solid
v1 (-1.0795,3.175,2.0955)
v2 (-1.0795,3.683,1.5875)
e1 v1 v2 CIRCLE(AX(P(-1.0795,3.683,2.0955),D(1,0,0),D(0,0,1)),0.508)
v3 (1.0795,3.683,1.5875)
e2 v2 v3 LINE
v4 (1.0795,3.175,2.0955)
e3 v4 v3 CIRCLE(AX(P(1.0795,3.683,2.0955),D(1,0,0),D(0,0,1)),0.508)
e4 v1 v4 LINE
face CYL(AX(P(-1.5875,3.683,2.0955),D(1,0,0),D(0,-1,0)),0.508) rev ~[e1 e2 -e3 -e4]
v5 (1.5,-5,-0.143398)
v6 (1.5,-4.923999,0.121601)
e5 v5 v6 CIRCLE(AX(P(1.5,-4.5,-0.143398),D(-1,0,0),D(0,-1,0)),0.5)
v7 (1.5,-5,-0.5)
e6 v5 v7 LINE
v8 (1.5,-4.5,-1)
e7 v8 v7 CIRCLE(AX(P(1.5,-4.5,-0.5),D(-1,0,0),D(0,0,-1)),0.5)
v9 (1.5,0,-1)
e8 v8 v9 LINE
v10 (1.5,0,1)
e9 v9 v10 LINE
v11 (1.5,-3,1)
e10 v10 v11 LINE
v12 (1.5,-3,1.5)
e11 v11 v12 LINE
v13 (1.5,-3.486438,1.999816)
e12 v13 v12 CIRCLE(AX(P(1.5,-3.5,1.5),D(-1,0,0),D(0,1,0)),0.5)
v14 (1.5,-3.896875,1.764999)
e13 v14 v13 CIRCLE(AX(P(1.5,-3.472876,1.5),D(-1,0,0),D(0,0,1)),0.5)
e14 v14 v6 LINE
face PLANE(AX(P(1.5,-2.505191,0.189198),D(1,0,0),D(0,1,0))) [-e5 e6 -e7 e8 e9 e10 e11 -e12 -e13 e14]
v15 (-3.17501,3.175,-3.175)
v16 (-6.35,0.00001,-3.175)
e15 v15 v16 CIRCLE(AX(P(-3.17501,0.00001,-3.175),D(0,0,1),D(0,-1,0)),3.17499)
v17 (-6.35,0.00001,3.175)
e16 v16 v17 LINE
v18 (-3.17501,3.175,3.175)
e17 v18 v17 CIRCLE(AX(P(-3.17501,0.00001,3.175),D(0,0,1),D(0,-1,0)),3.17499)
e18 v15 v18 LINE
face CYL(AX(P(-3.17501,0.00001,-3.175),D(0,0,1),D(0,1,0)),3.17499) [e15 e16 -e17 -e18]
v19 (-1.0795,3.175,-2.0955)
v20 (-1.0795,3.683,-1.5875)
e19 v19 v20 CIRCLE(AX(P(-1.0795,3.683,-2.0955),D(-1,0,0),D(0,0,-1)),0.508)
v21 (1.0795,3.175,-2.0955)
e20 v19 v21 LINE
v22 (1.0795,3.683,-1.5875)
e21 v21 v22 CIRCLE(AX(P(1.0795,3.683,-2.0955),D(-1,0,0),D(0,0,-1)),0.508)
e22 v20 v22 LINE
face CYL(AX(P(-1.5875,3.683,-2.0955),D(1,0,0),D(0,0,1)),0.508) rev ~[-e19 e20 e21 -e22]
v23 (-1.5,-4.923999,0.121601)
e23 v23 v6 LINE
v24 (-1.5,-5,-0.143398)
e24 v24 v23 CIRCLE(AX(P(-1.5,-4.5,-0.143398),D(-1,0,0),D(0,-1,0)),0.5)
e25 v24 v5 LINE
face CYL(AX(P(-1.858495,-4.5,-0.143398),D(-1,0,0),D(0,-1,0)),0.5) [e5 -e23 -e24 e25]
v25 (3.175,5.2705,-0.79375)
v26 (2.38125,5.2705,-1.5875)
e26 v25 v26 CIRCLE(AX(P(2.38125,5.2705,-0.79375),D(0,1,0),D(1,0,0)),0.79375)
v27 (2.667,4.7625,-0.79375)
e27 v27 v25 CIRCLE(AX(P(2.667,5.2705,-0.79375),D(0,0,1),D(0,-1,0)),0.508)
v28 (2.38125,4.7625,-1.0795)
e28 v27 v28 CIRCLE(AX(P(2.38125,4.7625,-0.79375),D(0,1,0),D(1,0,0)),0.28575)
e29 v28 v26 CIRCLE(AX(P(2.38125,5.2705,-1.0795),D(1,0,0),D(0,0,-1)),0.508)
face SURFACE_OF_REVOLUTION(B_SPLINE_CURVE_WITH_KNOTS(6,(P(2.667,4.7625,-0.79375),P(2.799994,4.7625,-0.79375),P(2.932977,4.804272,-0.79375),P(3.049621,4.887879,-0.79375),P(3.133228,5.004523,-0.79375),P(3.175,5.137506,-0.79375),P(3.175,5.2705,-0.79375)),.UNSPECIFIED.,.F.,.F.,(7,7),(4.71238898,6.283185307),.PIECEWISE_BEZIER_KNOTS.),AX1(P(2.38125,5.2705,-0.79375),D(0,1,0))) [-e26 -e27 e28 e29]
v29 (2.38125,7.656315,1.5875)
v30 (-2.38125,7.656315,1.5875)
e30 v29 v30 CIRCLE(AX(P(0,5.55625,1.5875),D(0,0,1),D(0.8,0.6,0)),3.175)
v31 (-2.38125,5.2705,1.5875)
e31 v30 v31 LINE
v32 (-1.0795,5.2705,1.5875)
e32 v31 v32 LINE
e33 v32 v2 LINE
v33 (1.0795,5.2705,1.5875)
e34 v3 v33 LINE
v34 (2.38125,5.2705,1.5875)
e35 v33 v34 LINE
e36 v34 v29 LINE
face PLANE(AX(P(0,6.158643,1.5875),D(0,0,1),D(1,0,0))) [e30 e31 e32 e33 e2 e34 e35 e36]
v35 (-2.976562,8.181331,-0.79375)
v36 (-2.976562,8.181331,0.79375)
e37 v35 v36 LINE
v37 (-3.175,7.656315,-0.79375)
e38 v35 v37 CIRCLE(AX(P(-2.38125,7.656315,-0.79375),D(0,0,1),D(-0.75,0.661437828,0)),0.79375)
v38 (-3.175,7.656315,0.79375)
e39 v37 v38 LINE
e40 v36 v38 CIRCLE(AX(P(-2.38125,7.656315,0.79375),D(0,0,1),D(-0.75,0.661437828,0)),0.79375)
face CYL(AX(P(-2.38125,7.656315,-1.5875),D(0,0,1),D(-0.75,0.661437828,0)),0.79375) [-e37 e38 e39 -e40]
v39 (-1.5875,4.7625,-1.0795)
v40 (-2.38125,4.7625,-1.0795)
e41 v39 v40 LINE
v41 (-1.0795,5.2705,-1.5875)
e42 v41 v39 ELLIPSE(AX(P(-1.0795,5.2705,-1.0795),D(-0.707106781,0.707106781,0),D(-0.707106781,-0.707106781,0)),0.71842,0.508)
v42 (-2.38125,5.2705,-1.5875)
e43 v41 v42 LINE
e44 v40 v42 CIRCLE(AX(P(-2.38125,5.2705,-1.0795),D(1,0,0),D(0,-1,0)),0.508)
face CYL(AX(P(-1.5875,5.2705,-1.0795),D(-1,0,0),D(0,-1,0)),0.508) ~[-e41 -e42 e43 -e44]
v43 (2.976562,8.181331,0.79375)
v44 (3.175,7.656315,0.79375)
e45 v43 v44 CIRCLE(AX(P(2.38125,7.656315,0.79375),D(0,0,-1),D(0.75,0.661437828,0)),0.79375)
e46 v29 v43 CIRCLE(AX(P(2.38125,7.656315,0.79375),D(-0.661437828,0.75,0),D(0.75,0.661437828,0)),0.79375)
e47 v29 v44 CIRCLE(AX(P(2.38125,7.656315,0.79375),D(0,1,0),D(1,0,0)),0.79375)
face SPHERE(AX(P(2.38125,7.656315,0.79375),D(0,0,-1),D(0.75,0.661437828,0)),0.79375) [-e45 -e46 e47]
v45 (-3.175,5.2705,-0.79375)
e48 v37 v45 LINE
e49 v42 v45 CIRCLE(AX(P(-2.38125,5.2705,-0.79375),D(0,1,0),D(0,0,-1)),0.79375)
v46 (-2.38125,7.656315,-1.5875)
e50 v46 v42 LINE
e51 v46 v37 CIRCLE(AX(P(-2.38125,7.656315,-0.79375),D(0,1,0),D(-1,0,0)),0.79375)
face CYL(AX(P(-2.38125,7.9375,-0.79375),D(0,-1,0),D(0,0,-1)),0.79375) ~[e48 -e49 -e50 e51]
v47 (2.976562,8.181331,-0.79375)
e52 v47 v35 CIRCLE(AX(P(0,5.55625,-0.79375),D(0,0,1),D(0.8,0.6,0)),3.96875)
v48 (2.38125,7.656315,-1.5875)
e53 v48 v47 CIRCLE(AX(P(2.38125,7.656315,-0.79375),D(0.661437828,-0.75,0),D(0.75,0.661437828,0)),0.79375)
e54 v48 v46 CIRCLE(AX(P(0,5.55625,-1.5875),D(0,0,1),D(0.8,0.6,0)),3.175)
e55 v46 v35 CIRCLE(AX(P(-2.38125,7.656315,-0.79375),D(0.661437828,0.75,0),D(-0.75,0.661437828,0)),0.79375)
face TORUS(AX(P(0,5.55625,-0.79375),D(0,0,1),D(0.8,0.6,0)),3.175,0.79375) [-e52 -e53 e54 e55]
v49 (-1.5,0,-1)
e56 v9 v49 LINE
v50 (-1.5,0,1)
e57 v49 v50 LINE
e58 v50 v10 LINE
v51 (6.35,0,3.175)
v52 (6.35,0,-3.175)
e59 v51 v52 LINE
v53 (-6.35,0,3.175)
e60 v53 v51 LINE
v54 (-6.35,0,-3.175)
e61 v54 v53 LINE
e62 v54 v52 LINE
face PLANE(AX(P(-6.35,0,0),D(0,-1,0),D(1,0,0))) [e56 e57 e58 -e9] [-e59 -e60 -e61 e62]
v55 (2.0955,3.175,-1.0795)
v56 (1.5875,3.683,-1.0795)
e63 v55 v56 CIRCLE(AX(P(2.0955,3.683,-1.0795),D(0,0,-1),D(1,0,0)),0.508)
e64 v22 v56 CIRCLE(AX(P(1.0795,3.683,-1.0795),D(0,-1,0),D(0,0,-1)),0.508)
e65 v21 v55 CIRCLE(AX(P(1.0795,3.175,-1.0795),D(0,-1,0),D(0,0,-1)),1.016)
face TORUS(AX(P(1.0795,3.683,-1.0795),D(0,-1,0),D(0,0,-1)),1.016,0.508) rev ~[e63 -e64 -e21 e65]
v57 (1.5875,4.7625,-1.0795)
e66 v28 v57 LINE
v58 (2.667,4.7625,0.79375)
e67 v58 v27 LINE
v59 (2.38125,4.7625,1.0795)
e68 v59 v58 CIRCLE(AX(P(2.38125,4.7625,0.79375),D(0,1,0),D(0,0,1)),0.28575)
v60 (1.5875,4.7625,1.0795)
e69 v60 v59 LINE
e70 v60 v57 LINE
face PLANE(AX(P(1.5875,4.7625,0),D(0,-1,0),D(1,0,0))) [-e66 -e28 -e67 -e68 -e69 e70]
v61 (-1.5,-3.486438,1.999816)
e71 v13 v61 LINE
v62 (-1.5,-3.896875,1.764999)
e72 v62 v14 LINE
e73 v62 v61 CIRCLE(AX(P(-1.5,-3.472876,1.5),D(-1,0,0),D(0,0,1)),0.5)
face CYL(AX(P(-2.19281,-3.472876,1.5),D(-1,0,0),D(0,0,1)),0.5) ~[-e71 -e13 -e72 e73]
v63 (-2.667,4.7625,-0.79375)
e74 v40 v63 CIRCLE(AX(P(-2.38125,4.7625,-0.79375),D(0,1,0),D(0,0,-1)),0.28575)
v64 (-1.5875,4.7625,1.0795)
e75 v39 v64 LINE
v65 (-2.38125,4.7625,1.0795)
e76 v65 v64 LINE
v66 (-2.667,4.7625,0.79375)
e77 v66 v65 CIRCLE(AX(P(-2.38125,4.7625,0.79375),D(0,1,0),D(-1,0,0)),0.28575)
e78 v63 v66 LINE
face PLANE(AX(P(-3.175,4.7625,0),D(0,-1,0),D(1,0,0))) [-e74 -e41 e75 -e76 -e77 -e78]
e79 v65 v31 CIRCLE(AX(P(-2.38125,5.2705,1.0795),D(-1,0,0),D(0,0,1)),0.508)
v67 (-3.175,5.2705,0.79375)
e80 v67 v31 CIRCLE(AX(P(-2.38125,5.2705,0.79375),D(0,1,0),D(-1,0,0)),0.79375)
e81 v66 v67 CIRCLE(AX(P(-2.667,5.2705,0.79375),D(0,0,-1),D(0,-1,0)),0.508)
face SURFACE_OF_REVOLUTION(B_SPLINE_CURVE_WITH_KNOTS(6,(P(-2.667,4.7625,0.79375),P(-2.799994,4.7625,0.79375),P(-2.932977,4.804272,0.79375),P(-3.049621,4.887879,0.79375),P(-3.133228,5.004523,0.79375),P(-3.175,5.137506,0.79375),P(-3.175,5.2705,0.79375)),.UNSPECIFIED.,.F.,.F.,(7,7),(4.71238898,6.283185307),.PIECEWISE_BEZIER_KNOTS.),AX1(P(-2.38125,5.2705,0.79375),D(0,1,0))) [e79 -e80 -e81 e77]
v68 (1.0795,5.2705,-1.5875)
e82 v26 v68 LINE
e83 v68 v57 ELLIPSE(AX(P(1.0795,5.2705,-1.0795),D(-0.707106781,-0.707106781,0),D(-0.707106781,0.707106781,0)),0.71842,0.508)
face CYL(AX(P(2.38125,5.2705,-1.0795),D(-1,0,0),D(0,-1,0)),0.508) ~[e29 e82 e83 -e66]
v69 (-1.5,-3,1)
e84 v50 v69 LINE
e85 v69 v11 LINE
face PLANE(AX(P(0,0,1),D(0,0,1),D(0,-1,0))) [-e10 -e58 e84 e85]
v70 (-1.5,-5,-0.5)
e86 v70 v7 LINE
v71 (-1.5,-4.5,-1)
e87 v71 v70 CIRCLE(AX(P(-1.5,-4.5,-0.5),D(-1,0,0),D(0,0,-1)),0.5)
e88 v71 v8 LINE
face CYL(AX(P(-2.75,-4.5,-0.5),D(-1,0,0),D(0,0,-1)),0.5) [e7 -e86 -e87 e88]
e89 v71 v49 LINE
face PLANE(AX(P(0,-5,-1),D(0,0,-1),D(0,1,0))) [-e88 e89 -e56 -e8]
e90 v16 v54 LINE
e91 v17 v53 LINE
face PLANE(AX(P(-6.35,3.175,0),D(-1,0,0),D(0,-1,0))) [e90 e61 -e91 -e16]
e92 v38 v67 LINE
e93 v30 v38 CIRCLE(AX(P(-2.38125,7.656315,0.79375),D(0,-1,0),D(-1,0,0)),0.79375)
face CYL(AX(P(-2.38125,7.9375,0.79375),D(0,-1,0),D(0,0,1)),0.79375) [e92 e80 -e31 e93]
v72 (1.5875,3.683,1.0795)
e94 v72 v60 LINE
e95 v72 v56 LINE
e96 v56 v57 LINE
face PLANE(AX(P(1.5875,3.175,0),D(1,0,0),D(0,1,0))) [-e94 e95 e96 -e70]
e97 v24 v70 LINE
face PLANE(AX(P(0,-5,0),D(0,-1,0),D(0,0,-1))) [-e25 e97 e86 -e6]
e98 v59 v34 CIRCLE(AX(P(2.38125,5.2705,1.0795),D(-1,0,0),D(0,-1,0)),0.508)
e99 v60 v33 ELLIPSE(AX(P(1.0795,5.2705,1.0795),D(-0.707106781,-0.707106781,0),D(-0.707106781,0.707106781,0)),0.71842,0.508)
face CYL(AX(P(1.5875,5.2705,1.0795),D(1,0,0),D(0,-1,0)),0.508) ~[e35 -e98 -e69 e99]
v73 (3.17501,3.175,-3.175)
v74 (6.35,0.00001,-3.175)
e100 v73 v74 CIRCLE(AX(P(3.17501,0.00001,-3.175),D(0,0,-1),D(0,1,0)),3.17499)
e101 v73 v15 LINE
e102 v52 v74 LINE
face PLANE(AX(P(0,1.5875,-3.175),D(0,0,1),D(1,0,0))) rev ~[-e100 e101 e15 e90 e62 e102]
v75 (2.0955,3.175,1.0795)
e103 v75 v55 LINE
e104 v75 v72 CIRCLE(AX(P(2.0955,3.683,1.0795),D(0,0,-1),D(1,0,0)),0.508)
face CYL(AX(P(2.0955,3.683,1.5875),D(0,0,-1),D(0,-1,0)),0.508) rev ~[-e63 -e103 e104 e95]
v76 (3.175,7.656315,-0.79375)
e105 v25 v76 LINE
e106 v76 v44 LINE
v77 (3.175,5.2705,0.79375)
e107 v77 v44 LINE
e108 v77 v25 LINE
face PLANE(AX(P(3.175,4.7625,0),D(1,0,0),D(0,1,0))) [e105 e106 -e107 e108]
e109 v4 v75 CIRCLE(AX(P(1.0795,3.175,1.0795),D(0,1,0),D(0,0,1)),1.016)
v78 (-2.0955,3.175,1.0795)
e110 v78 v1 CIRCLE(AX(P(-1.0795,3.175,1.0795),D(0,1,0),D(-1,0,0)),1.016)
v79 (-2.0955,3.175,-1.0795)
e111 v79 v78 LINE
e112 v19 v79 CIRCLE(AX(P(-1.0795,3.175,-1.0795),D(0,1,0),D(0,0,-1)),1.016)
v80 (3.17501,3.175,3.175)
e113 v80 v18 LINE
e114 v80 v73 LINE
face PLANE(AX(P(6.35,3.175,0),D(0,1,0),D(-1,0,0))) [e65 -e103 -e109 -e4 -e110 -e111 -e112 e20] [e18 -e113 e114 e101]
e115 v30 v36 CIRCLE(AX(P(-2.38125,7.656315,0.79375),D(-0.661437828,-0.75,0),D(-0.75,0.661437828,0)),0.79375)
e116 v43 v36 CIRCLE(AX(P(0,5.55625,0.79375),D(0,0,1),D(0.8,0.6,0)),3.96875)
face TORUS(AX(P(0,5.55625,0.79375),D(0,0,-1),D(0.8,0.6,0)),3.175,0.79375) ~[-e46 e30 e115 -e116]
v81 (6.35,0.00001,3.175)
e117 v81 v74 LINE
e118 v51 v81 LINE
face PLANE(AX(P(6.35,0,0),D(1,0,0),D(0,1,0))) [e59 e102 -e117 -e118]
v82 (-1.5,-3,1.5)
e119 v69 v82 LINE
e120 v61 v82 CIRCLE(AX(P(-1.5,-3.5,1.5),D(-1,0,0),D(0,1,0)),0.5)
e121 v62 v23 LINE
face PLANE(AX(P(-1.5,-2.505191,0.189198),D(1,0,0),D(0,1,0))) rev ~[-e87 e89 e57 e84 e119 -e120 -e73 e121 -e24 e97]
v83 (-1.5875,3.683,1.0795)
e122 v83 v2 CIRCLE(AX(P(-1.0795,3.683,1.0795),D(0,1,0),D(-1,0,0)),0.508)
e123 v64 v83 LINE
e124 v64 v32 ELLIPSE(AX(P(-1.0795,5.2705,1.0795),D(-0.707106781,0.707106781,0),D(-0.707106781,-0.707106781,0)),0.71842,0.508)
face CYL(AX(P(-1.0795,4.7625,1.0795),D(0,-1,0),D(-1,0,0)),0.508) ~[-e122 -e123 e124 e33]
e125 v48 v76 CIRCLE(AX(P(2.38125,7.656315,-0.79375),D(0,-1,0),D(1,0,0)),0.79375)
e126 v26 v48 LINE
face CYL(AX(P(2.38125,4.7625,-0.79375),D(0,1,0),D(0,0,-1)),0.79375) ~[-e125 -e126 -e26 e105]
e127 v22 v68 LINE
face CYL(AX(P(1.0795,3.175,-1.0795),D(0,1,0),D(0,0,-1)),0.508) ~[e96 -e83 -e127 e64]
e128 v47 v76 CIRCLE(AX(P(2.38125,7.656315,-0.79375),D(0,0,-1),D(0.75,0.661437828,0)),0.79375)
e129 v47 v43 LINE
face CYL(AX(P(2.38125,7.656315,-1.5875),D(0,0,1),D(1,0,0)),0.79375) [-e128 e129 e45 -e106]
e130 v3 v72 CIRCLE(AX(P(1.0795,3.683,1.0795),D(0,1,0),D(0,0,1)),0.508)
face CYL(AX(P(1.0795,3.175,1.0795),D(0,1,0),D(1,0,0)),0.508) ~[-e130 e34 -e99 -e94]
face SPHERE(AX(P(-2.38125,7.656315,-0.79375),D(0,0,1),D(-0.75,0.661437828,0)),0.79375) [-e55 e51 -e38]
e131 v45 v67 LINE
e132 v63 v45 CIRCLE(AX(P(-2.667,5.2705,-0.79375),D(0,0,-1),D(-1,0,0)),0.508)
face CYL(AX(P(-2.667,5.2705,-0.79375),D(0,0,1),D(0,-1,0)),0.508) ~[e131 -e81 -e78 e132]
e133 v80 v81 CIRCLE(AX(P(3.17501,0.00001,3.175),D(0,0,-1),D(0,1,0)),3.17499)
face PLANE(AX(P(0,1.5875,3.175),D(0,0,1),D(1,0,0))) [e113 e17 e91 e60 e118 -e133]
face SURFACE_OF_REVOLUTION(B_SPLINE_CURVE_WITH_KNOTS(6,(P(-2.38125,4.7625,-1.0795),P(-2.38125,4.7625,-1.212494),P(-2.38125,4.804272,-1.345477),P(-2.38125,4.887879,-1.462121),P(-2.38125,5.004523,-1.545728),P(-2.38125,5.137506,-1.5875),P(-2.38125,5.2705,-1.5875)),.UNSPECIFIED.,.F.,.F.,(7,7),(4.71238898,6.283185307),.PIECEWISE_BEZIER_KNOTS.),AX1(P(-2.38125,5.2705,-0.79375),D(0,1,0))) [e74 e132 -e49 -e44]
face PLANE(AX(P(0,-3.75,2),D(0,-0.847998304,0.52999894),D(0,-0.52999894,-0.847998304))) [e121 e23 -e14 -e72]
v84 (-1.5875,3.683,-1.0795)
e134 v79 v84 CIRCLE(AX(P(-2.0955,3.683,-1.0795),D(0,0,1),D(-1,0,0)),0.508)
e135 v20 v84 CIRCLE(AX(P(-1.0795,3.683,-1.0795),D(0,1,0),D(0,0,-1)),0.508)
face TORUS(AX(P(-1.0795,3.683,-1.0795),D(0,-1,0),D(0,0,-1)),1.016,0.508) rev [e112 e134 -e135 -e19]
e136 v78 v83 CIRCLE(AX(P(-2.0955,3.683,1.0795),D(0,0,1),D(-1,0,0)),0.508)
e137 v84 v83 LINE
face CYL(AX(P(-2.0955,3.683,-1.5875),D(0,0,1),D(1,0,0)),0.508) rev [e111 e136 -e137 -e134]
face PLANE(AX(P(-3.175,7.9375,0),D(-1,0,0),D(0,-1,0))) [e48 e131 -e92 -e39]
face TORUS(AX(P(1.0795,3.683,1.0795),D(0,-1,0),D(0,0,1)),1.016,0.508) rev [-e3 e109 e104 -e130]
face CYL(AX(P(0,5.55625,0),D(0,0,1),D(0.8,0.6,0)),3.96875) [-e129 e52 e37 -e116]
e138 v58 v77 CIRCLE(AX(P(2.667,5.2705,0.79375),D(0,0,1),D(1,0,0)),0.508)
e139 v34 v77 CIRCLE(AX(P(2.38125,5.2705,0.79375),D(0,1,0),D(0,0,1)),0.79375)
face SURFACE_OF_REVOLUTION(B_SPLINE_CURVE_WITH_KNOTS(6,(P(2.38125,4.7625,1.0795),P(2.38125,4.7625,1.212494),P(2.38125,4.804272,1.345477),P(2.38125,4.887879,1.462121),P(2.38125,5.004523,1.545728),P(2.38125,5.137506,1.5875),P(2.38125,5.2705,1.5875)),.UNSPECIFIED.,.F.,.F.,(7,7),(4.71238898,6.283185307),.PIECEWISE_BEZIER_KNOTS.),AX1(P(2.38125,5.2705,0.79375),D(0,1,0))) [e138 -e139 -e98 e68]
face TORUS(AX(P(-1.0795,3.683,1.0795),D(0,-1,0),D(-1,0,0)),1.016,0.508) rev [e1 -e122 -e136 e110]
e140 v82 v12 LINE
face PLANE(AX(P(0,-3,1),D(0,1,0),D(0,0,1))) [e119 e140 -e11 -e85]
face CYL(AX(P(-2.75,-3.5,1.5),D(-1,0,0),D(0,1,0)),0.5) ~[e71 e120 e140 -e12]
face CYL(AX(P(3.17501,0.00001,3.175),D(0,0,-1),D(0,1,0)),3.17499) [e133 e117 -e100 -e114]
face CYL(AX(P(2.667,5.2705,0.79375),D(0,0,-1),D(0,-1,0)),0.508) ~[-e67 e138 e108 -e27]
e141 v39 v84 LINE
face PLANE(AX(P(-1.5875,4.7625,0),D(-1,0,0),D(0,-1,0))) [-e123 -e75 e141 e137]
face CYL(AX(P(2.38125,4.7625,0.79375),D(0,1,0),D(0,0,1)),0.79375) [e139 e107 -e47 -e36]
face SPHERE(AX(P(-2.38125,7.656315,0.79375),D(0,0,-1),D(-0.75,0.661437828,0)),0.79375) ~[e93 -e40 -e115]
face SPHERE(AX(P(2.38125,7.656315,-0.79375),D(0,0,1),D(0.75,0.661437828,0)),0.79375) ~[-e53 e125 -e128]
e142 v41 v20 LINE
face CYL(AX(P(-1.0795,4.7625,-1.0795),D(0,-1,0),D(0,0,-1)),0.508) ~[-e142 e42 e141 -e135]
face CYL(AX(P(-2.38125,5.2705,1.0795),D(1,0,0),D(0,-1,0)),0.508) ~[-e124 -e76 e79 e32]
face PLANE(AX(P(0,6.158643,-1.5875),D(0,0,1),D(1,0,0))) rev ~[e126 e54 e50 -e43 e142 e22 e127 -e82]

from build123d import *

# Parameters (mm, degrees)
F1_DEPTH    = 1.5875
F2_DEPTH    = 3.175
F3_R        = 3.17499
F4_R        = 0.79375
F5_R        = 0.508
F7_DEPTH    = 1.5
F8_T1_DEPTH = 5.5
F8_T3_DEPTH = 3.716990566
F8_T5_DEPTH = 4.3856191038


# Not quite as in the source:
# - a fillet or chamfer that OpenCascade refuses, or shapes differently, is made with other operations: its cross-section is extruded or revolved along the edge and cut away or added
# - a fillet or chamfer is up to 0.001 mm smaller than in the source, because OpenCascade refuses the exact size


with BuildPart() as f1:
    # F0 (on Top) → F1 (new body, symmetric)
    with BuildSketch(Plane.XY):
        with BuildLine():
            Line((3.175, 4.7625), (3.175, 7.9375))
            ThreePointArc((3.175, 7.9375), (0, 9.525), (-3.175, 7.9375))
            Line((-3.175, 7.9375), (-3.175, 4.7625))
            Line((-3.175, 4.7625), (-1.5875, 4.7625))
            Line((-1.5875, 4.7625), (-1.5875, 3.175))
            Line((-1.5875, 3.175), (1.5875, 3.175))
            Line((1.5875, 3.175), (1.5875, 4.7625))
            Line((1.5875, 4.7625), (3.175, 4.7625))
        make_face()
    extrude(amount=F1_DEPTH, both=True)

    # F0 (on Top) → F2 (join, symmetric)
    with BuildSketch(Plane.XY):
        Polygon((6.35, 3.175), (1.5875, 3.175), (-1.5875, 3.175), (-6.35, 3.175), (-6.35, 0), (6.35, 0), align=None)
    extrude(amount=F2_DEPTH, both=True)

    # F3 (radius 3.175 in the source; OpenCascade refuses exactly that, so slightly less here)
    f3_edges = [f1.edges().sort_by_distance(p)[0] for p in [
        (6.35, 3.175, 0),
        (-6.35, 3.175, 0),
    ]]
    fillet(f3_edges, radius=F3_R)

    # F4
    f4_edges = [f1.edges().sort_by_distance(p)[0] for p in [
        (0, 9.525, -1.5875),
        (0, 9.525, 1.5875),
        (3.175, 6.35, -1.5875),
        (3.175, 6.35, 1.5875),
        (-3.175, 6.35, -1.5875),
        (-3.175, 6.35, 1.5875),
        (3.175, 7.9375, 0),
        (-3.175, 7.9375, 0),
    ]]
    fillet(f4_edges, radius=F4_R)

    # F5
    f5_edges = [f1.edges().sort_by_distance(p)[0] for p in [
        (0, 3.175, -1.5875),
        (-1.5875, 3.175, 0),
        (0, 3.175, 1.5875),
        (1.5875, 3.175, 0),
        (1.5875, 3.96875, 1.5875),
        (1.5875, 3.96875, -1.5875),
        (-1.5875, 3.96875, -1.5875),
        (-1.5875, 3.96875, 1.5875),
        (2.942516, 4.7625, 1.355016),
        (-2.942516, 4.7625, -1.355016),
        (1.984375, 4.7625, -1.5875),
        (-1.984375, 4.7625, -1.5875),
        (2.942516, 4.7625, -1.355016),
        (3.175, 4.7625, 0),
        (1.984375, 4.7625, 1.5875),
        (-3.175, 4.7625, 0),
        (-2.942516, 4.7625, 1.355016),
        (-1.984375, 4.7625, 1.5875),
    ]]
    fillet(f5_edges, radius=F5_R)

    # F6 (on Right) → F7 (join, symmetric)
    with BuildSketch(Plane.YZ):
        Polygon((0, -1), (0, 1), (-3, 1), (-3, 2), (-3.75, 2), (-5, 0), (-5, -1), align=None)
    extrude(amount=F7_DEPTH, both=True)

    # F8: fillet of radius 0.5 on 4 edges, made by hand

    # F8_s2 → F8_t1 (cut)
    with BuildSketch(Plane.YZ.offset(-2.75)):
        with BuildLine():
            ThreePointArc((-4.5, -1), (-4.8535533906, -0.8535533906), (-5, -0.5))
            Line((-5, -0.5), (-5, -1))
            Line((-5, -1), (-4.5, -1))
        make_face()
        with BuildLine():
            ThreePointArc((-3, 1.5), (-3.1464466094, 1.8535533906), (-3.5, 2))
            Line((-3.5, 2), (-3, 2))
            Line((-3, 2), (-3, 1.5))
        make_face()
    extrude(amount=F8_T1_DEPTH, mode=Mode.SUBTRACT)

    # F8_s4 → F8_t3 (cut)
    with BuildSketch(Plane.YZ.offset(-1.858495283)):
        with BuildLine():
            ThreePointArc((-5, -0.1433981132), (-4.9806243731, -0.0055568567), (-4.923999152, 0.1216013568))
            Line((-4.923999152, 0.1216013568), (-5, 0))
            Line((-5, 0), (-5, -0.1433981132))
        make_face()
    extrude(amount=F8_T3_DEPTH, mode=Mode.SUBTRACT)

    # F8_s6 → F8_t5 (cut)
    with BuildSketch(Plane.YZ.offset(-2.1928095519)):
        with BuildLine():
            ThreePointArc((-3.4728761792, 2), (-3.7152604454, 1.9373212406), (-3.8968753312, 1.76499947))
            Line((-3.8968753312, 1.76499947), (-3.75, 2))
            Line((-3.75, 2), (-3.4728761792, 2))
        make_face()
    extrude(amount=F8_T5_DEPTH, mode=Mode.SUBTRACT)


solid = f1.part
